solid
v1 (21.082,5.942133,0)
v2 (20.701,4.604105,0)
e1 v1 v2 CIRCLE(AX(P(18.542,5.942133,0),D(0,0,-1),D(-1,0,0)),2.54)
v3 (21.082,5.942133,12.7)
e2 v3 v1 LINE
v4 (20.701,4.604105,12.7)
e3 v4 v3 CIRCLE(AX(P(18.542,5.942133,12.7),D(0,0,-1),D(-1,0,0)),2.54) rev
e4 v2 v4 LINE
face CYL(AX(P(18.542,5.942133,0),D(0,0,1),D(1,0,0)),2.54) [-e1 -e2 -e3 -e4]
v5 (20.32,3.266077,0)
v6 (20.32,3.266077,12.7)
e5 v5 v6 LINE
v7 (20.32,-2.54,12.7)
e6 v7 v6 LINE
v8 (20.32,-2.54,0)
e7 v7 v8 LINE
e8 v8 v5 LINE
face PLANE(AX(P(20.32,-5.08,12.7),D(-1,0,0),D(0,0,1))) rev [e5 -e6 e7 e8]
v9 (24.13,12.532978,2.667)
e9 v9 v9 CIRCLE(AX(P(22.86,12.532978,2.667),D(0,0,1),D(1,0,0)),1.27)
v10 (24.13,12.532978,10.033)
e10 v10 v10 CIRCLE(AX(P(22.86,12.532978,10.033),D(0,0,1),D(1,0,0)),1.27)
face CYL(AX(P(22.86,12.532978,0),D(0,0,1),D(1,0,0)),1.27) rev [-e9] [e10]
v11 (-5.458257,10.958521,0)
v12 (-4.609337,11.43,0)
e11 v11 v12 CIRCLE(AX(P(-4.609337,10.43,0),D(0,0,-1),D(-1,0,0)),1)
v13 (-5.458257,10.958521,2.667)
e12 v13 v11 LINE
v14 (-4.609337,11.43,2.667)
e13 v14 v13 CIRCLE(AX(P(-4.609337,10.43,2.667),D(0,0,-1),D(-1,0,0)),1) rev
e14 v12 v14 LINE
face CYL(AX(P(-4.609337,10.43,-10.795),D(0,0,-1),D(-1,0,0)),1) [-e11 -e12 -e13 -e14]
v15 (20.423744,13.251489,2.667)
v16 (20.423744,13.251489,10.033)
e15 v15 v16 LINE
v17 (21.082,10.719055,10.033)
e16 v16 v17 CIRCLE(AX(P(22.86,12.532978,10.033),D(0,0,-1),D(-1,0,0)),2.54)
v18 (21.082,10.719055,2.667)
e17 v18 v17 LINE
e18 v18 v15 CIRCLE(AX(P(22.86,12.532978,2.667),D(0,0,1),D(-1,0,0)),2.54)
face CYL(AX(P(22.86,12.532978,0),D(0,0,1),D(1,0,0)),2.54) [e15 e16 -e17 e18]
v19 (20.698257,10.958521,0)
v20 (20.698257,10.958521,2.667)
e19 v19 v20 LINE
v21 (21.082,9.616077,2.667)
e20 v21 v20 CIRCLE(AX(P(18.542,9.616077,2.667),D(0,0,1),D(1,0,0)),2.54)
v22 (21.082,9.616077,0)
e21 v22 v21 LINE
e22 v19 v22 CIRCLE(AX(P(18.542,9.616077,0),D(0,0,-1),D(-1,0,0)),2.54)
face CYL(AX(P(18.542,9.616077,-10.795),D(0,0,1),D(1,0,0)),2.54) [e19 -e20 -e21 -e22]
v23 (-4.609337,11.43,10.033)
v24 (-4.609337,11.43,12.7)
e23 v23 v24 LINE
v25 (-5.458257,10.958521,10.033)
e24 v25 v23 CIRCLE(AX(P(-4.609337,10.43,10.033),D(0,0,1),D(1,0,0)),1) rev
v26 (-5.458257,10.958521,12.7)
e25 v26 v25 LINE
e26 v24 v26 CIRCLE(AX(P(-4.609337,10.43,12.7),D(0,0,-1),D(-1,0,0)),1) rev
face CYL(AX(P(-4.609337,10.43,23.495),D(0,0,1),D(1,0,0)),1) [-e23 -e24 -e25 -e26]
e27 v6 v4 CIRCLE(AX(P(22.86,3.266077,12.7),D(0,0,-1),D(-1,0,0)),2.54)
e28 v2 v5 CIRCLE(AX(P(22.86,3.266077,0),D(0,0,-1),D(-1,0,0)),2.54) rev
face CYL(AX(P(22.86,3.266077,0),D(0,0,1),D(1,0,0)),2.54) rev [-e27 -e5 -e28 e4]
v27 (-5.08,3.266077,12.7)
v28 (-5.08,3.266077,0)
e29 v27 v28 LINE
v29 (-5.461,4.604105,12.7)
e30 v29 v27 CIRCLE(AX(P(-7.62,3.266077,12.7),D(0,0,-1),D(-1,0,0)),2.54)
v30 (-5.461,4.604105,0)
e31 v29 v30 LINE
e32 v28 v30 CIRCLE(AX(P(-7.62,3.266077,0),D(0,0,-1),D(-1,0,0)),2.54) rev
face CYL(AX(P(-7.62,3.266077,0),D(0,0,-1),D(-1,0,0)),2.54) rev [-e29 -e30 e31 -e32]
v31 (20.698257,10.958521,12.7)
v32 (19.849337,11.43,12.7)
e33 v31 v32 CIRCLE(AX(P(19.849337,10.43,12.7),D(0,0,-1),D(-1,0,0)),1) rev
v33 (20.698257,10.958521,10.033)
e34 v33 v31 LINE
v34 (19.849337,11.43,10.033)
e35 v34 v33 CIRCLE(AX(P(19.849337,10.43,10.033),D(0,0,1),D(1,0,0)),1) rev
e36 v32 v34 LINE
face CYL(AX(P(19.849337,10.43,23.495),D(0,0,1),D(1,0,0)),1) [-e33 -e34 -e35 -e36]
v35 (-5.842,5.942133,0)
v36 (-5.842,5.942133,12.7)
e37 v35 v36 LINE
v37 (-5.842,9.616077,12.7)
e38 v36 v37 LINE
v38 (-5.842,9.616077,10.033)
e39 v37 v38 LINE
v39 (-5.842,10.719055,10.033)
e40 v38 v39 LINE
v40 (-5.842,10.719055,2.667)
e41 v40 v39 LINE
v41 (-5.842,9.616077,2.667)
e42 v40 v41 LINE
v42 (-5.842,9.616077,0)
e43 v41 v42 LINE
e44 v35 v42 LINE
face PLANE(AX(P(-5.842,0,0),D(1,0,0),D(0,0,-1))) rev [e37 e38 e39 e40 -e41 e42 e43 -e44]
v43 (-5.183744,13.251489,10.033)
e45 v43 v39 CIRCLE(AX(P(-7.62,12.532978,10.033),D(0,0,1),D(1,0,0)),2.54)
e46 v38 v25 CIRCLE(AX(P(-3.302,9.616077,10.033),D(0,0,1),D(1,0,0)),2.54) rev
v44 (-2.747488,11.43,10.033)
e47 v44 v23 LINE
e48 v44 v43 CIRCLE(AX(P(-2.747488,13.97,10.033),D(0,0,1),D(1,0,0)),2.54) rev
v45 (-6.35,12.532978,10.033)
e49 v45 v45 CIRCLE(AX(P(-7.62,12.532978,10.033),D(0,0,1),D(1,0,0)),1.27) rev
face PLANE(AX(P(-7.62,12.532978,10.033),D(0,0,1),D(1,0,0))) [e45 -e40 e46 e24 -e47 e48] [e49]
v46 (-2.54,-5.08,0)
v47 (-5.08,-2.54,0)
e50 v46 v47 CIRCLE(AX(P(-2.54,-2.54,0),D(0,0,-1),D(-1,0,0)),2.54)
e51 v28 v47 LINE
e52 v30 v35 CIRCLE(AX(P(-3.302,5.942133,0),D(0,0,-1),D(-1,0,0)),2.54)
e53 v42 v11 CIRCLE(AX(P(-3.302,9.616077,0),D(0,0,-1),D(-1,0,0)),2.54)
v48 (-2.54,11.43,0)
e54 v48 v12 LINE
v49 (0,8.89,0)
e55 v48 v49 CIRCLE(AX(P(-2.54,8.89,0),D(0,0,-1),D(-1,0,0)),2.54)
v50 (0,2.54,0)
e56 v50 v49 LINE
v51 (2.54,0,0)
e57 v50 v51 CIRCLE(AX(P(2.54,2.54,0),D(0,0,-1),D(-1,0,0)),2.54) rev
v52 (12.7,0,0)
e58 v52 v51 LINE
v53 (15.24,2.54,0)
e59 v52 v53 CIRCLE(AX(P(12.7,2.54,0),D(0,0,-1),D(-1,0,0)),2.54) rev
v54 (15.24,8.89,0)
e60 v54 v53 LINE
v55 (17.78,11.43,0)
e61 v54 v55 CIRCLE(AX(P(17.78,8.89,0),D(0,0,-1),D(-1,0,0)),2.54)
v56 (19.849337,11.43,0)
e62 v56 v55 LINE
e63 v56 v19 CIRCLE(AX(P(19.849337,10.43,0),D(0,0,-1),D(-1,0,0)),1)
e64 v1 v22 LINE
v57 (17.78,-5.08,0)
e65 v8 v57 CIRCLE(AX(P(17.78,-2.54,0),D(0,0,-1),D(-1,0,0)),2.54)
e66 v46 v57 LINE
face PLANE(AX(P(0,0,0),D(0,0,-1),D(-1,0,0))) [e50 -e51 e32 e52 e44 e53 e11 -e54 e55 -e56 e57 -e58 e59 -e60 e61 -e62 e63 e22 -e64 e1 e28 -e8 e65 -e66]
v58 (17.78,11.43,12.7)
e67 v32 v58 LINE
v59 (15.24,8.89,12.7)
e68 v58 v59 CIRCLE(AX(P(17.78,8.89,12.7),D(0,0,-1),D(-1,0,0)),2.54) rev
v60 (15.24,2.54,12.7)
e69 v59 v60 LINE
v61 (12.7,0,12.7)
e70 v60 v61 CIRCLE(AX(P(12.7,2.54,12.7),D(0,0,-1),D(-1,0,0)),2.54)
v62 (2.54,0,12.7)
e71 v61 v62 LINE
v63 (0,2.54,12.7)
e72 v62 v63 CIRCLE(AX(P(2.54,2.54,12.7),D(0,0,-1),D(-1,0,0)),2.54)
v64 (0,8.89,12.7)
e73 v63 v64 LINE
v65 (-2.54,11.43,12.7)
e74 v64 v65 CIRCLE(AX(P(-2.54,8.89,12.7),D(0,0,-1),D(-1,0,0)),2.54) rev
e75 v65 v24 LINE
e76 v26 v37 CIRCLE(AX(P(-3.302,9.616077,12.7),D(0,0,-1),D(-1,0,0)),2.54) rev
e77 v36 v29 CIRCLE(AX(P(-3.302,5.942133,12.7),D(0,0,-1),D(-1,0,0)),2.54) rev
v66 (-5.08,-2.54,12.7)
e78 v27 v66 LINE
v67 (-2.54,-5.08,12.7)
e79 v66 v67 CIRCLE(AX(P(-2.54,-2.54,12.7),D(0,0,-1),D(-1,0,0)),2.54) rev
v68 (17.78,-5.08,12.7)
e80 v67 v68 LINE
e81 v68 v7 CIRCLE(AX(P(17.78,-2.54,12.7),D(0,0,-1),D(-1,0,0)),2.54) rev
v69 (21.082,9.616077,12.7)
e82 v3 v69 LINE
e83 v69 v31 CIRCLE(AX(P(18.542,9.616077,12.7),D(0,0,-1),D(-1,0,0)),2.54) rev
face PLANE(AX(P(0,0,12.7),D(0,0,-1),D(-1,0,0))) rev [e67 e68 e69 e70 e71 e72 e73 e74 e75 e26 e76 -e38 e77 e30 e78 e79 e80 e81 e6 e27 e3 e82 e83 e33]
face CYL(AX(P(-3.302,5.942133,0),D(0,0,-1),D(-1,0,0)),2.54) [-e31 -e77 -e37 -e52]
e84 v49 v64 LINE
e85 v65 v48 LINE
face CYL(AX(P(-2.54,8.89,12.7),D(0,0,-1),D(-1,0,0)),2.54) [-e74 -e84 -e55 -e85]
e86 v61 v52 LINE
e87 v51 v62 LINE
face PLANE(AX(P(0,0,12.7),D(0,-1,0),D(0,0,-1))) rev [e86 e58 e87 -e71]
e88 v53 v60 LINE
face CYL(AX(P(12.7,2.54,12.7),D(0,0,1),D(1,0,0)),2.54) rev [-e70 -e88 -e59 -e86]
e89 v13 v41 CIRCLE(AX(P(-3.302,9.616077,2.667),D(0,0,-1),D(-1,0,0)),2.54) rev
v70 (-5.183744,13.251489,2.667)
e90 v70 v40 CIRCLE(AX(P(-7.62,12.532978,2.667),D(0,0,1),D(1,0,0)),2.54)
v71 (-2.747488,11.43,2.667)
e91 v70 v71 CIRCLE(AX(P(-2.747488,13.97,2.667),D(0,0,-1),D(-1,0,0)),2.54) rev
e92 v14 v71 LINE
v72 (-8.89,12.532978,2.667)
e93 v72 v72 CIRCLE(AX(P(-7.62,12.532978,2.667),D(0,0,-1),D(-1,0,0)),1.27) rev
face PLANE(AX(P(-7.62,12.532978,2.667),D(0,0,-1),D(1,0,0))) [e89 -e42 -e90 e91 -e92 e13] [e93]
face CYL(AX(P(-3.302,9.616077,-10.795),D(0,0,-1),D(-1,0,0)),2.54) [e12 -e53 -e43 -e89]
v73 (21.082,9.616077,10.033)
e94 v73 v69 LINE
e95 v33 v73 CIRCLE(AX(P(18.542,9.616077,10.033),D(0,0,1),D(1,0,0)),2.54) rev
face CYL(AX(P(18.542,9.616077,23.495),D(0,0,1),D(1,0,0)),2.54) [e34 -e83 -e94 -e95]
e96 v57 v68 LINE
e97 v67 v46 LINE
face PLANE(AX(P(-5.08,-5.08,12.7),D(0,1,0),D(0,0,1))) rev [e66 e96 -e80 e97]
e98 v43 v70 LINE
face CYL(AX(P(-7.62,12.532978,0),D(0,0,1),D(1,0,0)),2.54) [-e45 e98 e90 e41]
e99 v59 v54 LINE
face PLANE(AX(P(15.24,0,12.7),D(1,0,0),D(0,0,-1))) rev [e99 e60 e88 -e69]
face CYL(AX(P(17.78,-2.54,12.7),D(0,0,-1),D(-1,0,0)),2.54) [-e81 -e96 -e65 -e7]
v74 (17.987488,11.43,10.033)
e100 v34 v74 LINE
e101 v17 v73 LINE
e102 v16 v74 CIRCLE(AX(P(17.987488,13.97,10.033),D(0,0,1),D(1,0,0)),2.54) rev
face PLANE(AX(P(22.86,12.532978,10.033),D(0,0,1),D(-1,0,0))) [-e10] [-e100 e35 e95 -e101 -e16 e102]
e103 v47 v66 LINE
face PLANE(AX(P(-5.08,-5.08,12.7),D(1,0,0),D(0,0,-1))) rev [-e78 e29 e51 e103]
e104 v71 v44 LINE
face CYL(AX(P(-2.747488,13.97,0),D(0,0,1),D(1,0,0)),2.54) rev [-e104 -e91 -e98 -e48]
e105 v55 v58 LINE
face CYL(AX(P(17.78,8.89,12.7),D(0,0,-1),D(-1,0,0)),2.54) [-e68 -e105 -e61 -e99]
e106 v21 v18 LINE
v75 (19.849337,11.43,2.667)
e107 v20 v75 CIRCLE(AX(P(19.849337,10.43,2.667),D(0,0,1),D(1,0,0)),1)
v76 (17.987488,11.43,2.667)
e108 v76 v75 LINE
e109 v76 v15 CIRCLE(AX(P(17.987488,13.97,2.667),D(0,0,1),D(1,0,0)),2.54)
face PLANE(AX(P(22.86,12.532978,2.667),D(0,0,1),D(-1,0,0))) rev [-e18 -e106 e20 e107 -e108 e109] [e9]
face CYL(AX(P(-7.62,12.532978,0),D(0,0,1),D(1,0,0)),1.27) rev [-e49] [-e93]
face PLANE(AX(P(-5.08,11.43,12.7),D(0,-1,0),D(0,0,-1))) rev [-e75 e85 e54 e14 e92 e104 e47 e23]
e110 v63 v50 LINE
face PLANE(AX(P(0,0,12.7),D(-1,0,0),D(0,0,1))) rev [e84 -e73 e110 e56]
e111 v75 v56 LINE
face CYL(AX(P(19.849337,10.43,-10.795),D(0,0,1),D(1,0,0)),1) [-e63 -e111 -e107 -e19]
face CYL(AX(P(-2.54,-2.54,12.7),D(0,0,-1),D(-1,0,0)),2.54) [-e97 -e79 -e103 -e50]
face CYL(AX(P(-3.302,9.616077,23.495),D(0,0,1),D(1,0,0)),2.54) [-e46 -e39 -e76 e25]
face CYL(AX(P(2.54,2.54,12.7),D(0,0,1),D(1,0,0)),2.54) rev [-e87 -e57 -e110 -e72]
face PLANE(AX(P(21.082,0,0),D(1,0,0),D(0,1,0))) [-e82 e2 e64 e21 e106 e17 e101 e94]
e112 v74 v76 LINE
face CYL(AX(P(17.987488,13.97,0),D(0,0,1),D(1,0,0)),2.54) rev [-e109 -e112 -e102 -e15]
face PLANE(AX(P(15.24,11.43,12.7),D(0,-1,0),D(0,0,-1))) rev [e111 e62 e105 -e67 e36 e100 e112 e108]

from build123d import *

# Parameters (mm, degrees)
BOSS_EXTRUDE1_DEPTH = 12.7
SKETCH3_R           = 1.27
BOSS_EXTRUDE2_DEPTH = 12.7
CUT_EXTRUDE6_START  = 13.462
CUT_EXTRUDE6_DEPTH  = 13.462
FILLET2_R           = 2.54
FILLET3_R           = 2.54
FILLET4_R           = 2.54
FILLET5_R           = 2.54
FILLET6_R           = 1


with BuildPart() as part:
    # Sketch1 → Boss-Extrude1 (new body)
    with BuildSketch(Plane.XY):
        Polygon((-5.08, -5.08), (-5.08, 11.43), (0, 11.43), (0, 0), (15.24, 0), (15.24, 11.43), (20.32, 11.43), (20.32, -5.08), align=None)
    extrude(amount=BOSS_EXTRUDE1_DEPTH)

    # Sketch3 → Boss-Extrude2 (add)
    with BuildSketch(Plane.XY.offset(12.7)):
        with BuildLine():
            Line((-5.08, 5.08), (-5.08, 12.532978233))
            ThreePointArc((-5.08, 12.532978233), (-9.961764292, 13.516716003), (-5.842, 10.719055412))
            Line((-5.842, 10.719055412), (-5.842, 5.08))
            Line((-5.842, 5.08), (-5.08, 5.08))
        make_face()
        with Locations((-7.62, 12.532978233)):
            Circle(SKETCH3_R, mode=Mode.SUBTRACT)
    boss_extrude2 = extrude(amount=-BOSS_EXTRUDE2_DEPTH)

    # Sketch9 → Cut-Extrude6 (cut)
    with BuildSketch(Plane.XY.offset(10.033).offset(CUT_EXTRUDE6_START)):
        with BuildLine():
            Line((-5.08, 12.532978233), (-5.08, 11.43))
            Line((-5.08, 11.43), (-5.842, 10.719055412))
            ThreePointArc((-5.842, 10.719055412), (-9.961764292, 13.516716003), (-5.08, 12.532978233))
        make_face()
        with BuildLine():
            Line((21.082, 10.719055412), (20.32, 11.43))
            Line((20.32, 11.43), (20.32, 12.532978233))
            ThreePointArc((20.32, 12.532978233), (25.201764292, 13.516716003), (21.082, 10.719055412))
        make_face()
    cut_extrude6 = extrude(amount=-CUT_EXTRUDE6_DEPTH, mode=Mode.SUBTRACT)

    # Fillet2
    fillet2_edges = [part.edges().sort_by_distance(p)[0] for p in [
        (15.24, 11.43, 6.35),
        (0, 11.43, 6.35),
    ]]
    fillet(fillet2_edges, radius=FILLET2_R)

    # Fillet3
    fillet3_edges = [part.edges().sort_by_distance(p)[0] for p in [
        (0, 0, 6.35),
        (15.24, 0, 6.35),
    ]]
    fillet(fillet3_edges, radius=FILLET3_R)

    # Mirror1: Boss-Extrude2, Cut-Extrude6 across plane
    add(boss_extrude2.mirror(Plane(origin=(7.62, 0, 0), x_dir=(0, 0, 1), z_dir=(1, 0, 0))))
    add(cut_extrude6.mirror(Plane(origin=(7.62, 0, 0), x_dir=(0, 0, 1), z_dir=(1, 0, 0))), mode=Mode.SUBTRACT)

    # Mirror3: Cut-Extrude6 across plane
    add(cut_extrude6.mirror(Plane.XY.offset(6.35)), mode=Mode.SUBTRACT)

    # Fillet4
    # the kernel refuses this fillet: 2.54 mm, written as the material it adds along each edge
    with BuildSketch(Plane(origin=(20.32, 11.43, 10.033), x_dir=(-1, 0, 0), z_dir=(0, 0, -1)), Plane(origin=(-5.08, 11.43, 2.667), x_dir=(1, 0, 0), z_dir=(0, 0, 1))) as fillet4_piece_1:
        with BuildLine():
            CenterArc((2.332511513, 2.54), FILLET4_R, 196.432066058, 73.567933942)
            Line((-0.103744244, 1.821489116), (-0.347369819, 1.749638028))
            ThreePointArc((-0.347369819, 1.749638028), (-0.254, 1.102978233), (-0.254, 0))
            Line((-0.254, 0), (0, -0.254))
            Line((0, -0.254), (2.332511513, -0.254))
            Line((2.332511513, -0.254), (2.332511513, 0))
        make_face()
    extrude(amount=7.366)
    with BuildSketch(Plane(origin=(20.32, 5.08, 12.7), x_dir=(0, -1, 0), z_dir=(0, 0, -1))) as fillet4_piece_2:
        with BuildLine():
            CenterArc((1.813922821, -2.54), FILLET4_R, 90, 45.572995999)
            Line((0, -0.762), (0, 0))
            Line((0, 0), (1.813922821, 0))
        make_face()
    extrude(amount=12.7)
    with BuildSketch(Plane(origin=(-5.08, 5.08, 12.7), x_dir=(-1, 0, 0), z_dir=(0, 0, -1))) as fillet4_piece_3:
        with BuildLine():
            CenterArc((2.54, -1.813922821), FILLET4_R, 134.427004001, 45.572995999)
            Line((0, -1.813922821), (0, 0))
            Line((0, 0), (0.762, 0))
        make_face()
    extrude(amount=12.7)
    # the kernel refuses this fillet: 2.54 mm, written as the material it takes off along each edge
    with BuildSketch(Plane(origin=(-5.842, 10.719055412, 15.457445582), x_dir=(0.7311775057890088, 0.6821872580370908, 0), z_dir=(0, 0, -1)), Plane(origin=(-5.842, 10.719055412, 2.667), x_dir=(0.7311775057890088, 0.6821872580370908, 0), z_dir=(0, 0, -1))) as fillet4_2_piece_1:
        with BuildLine():
            CenterArc((1.104753168, 2.539228509), FILLET4_R, 223.014800445, 45.572995999)
            Line((-0.752437696, 0.806472873), (0, 0))
            Line((0, 0), (1.042154599, 0))
        make_face()
    extrude(amount=5.424445582, mode=Mode.SUBTRACT)
    with BuildSketch(Plane(origin=(21.082, 10.719055412, 2.667), x_dir=(-0.7311775057890088, 0.6821872580370906, 0), z_dir=(0, 0, -1))) as fillet4_2_piece_2:
        with BuildLine():
            CenterArc((1.104753168, -2.539228509), FILLET4_R, 91.412203555, 45.572995999)
            Line((-0.752437696, -0.806472873), (0, 0))
            Line((0, 0), (1.042154599, 0))
        make_face()
    extrude(amount=5.424445582, mode=Mode.SUBTRACT)
    with BuildSketch(Plane(origin=(21.082, 10.719055412, 15.457445582), x_dir=(0, -1, 0), z_dir=(0, 0, -1))) as fillet4_2_piece_3:
        with BuildLine():
            CenterArc((1.102978233, 2.54), FILLET4_R, 224.427004001, 45.572995999)
            Line((-0.710944588, 0.762), (0, 0))
            Line((0, 0), (1.102978233, 0))
        make_face()
    extrude(amount=5.424445582, mode=Mode.SUBTRACT)

    # Fillet5
    fillet5_edges = [part.edges().sort_by_distance(p)[0] for p in [
        (20.32, -5.08, 6.35),
        (-5.08, -5.08, 6.35),
        (-5.842, 5.08, 6.35),
        (21.082, 5.08, 6.35),
    ]]
    fillet(fillet5_edges, radius=FILLET5_R)

    # Fillet6
    fillet6_edges = [part.edges().sort_by_distance(p)[0] for p in [
        (-5.08, 11.43, 1.3335),
        (20.32, 11.43, 11.3665),
        (20.32, 11.43, 1.3335),
        (-5.08, 11.43, 11.3665),
    ]]
    fillet(fillet6_edges, radius=FILLET6_R)


solid = part.part
